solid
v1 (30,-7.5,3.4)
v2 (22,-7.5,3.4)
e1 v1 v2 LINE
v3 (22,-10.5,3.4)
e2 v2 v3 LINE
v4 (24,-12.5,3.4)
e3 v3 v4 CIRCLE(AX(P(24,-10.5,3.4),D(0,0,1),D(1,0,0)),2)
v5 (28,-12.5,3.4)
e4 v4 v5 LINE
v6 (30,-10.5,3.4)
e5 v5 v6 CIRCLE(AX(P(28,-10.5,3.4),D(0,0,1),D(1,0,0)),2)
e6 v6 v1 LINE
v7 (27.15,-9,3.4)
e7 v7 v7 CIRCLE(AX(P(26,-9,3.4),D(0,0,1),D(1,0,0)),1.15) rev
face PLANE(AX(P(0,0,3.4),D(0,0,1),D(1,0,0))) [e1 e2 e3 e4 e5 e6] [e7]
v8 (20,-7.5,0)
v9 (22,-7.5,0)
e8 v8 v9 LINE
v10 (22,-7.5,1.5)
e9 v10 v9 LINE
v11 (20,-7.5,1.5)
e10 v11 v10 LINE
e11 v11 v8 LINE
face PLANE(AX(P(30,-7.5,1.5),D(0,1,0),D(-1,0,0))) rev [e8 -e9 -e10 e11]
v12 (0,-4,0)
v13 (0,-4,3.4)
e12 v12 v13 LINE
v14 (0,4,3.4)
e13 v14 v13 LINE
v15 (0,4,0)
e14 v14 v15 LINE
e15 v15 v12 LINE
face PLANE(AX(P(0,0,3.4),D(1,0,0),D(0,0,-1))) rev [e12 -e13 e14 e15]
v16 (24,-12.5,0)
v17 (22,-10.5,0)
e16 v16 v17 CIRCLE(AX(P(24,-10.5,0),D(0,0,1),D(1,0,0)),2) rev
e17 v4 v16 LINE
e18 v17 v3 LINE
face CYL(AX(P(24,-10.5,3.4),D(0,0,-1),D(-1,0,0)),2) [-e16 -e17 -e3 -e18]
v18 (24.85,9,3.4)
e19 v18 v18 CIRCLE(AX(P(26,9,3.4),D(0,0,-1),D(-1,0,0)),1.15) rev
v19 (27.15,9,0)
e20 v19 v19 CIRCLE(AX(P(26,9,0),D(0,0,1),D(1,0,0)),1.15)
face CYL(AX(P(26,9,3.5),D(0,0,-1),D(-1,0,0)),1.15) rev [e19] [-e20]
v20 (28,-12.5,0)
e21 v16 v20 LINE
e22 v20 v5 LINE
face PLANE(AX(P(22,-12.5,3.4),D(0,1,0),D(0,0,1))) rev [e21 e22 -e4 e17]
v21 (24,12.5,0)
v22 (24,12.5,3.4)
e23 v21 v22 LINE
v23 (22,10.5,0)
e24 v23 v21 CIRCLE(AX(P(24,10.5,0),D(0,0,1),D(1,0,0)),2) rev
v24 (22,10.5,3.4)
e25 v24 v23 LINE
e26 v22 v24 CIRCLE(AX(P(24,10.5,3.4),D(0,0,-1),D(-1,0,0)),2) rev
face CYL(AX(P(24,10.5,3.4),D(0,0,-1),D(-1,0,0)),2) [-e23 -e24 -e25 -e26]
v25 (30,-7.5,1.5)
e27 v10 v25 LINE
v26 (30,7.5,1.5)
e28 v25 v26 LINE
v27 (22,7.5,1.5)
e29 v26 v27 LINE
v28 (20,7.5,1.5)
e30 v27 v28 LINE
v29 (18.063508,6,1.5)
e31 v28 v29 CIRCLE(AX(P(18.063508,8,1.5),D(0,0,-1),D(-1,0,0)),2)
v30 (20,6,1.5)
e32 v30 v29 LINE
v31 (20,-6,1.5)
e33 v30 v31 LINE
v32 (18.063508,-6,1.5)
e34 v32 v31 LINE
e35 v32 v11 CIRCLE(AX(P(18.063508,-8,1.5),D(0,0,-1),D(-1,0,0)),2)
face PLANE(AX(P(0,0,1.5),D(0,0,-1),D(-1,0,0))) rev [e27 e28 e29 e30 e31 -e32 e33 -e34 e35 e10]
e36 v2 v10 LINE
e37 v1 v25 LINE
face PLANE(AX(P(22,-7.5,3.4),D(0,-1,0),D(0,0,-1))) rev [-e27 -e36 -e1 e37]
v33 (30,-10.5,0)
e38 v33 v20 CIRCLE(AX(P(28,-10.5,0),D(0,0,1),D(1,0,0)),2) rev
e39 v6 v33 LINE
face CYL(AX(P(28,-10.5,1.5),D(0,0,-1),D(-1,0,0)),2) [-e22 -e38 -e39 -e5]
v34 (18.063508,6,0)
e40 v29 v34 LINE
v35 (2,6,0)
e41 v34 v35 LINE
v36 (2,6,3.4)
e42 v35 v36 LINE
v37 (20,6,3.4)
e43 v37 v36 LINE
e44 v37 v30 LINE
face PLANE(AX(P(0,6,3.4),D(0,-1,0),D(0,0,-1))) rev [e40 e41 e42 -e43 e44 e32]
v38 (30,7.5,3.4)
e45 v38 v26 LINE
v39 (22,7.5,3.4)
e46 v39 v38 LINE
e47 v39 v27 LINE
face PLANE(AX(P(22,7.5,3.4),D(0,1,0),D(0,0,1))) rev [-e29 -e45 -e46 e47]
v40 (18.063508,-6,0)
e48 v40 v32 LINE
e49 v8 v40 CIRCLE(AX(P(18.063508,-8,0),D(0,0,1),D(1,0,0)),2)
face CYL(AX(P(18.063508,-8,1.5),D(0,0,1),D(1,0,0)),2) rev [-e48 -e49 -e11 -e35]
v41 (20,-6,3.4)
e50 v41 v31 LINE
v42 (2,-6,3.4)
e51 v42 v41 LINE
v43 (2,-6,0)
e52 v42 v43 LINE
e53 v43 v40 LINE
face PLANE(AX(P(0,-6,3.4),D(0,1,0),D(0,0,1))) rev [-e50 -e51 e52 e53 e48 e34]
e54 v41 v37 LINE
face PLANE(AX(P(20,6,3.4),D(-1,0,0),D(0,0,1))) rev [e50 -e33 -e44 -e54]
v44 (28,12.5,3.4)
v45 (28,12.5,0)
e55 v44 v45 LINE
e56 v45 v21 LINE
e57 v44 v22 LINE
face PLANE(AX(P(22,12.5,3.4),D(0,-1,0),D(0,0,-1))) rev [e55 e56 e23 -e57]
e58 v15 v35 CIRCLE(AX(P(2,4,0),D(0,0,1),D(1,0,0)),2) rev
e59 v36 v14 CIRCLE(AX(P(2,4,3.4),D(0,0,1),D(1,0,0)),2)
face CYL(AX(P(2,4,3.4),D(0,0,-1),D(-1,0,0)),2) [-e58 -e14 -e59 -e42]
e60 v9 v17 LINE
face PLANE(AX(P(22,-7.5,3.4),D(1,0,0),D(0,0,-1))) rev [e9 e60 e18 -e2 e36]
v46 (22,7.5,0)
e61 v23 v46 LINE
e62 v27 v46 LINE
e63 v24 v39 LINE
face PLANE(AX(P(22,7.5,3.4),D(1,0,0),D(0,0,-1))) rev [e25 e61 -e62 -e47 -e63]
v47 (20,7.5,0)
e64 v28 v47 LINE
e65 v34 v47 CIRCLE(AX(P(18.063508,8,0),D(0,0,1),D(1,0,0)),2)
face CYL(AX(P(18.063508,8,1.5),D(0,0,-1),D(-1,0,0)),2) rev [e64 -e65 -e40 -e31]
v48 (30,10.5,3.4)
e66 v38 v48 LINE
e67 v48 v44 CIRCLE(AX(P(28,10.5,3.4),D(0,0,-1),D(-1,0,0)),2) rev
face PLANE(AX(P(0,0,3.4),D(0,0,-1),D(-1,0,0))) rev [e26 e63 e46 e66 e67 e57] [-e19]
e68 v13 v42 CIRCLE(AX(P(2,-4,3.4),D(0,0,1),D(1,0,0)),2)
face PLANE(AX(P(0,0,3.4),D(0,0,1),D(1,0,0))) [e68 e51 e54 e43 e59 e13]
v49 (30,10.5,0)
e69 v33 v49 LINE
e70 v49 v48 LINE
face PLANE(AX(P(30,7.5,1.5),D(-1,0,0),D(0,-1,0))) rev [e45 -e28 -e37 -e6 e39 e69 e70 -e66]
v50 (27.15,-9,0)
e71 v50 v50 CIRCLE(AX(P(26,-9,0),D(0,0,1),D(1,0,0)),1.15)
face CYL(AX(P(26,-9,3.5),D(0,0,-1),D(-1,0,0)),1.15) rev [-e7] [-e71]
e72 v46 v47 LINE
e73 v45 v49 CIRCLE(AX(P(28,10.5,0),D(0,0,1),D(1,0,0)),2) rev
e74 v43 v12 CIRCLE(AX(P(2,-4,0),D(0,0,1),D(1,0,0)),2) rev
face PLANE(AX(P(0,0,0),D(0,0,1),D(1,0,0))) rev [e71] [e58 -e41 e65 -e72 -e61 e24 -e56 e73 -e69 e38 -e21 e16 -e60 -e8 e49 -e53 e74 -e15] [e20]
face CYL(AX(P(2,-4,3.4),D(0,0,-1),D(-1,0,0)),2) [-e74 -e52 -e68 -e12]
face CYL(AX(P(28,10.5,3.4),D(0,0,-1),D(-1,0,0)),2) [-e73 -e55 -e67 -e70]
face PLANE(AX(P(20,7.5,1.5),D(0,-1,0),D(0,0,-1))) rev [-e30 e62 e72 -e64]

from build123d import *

# Parameters (mm, degrees)
DODANIE_WYCI_GNI_CIE1_DEPTH = 3.4
DODANIE_WYCI_GNI_CIE2_DEPTH = 1.5
ZAOKR_GLENIE1_R             = 2
SZKIC4_W                    = 8
SZKIC4_H                    = 5
DODANIE_WYCI_GNI_CIE3_DEPTH = 3.4
ZAOKR_GLENIE2_R             = 2
SZKIC6_R                    = 1.15
WYTNIJ_WYCI_GNI_CIE1_DEPTH  = 3.5


with BuildPart() as part:
    # Szkic1 → Dodanie-wyciągnięcie1 (new body)
    with BuildSketch(Plane.XY):
        Polygon((0, 0), (0, 6), (20, 6), (20, -6), (0, -6), align=None)
    extrude(amount=DODANIE_WYCI_GNI_CIE1_DEPTH)

    # Szkic3 → Dodanie-wyciągnięcie2 (add)
    with BuildSketch(Plane.XY):
        Polygon((20, 6), (20, 7.5), (30, 7.5), (30, -7.5), (20, -7.5), (20, -6), align=None)
    extrude(amount=DODANIE_WYCI_GNI_CIE2_DEPTH)

    # Zaokrąglenie1
    # the kernel refuses this fillet: 2 mm, written as the material it adds along each edge
    with BuildSketch(Plane(origin=(20, -6, 0), x_dir=(-1, 0, 0), z_dir=(0, 0, 1))) as zaokr_glenie1_piece_1:
        with BuildLine():
            CenterArc((1.936491673, 2), ZAOKR_GLENIE1_R, 194.477512186, 75.522487814)
            Line((0, 1.5), (0, 0))
            Line((0, 0), (1.936491673, 0))
        make_face()
    extrude(amount=1.5)
    with BuildSketch(Plane(origin=(20, 6, 0), x_dir=(-1, 0, 0), z_dir=(0, 0, 1))) as zaokr_glenie1_piece_2:
        with BuildLine():
            CenterArc((1.936491673, -2), ZAOKR_GLENIE1_R, 90, 75.522487814)
            Line((0, -1.5), (0, 0))
            Line((0, 0), (1.936491673, 0))
        make_face()
    extrude(amount=1.5)
    # the kernel refuses this fillet: 2 mm, written as the material it takes off along each edge
    with BuildSketch(Plane(origin=(0, -6, -5), x_dir=(0, 1, 0), z_dir=(0, 0, 1))) as zaokr_glenie1_2_piece_1:
        with BuildLine():
            CenterArc((ZAOKR_GLENIE1_R, -ZAOKR_GLENIE1_R), ZAOKR_GLENIE1_R, 90, 90)
            Line((0, -ZAOKR_GLENIE1_R), (0, 0))
            Line((0, 0), (ZAOKR_GLENIE1_R, 0))
        make_face()
    extrude(amount=13.4, mode=Mode.SUBTRACT)
    with BuildSketch(Plane(origin=(0, 6, -5), x_dir=(0, -1, 0), z_dir=(0, 0, 1))) as zaokr_glenie1_2_piece_2:
        with BuildLine():
            CenterArc((ZAOKR_GLENIE1_R, ZAOKR_GLENIE1_R), ZAOKR_GLENIE1_R, 180, 90)
            Line((0, ZAOKR_GLENIE1_R), (0, 0))
            Line((0, 0), (ZAOKR_GLENIE1_R, 0))
        make_face()
    extrude(amount=13.4, mode=Mode.SUBTRACT)

    # Szkic4 → Dodanie-wyciągnięcie3 (add)
    with BuildSketch(Plane.XY):
        with Locations((26, 10)):
            Rectangle(SZKIC4_W, SZKIC4_H)
        with Locations((26, -10)):
            Rectangle(SZKIC4_W, SZKIC4_H)
    extrude(amount=DODANIE_WYCI_GNI_CIE3_DEPTH)

    # Zaokrąglenie2
    zaokr_glenie2_edges = [part.edges().sort_by_distance(p)[0] for p in [
        (30, 12.5, 1.7),
        (22, 12.5, 1.7),
        (22, -12.5, 1.7),
        (30, -12.5, 1.7),
    ]]
    fillet(zaokr_glenie2_edges, radius=ZAOKR_GLENIE2_R)

    # Szkic6 → Wytnij-wyciągnięcie1 (cut)
    with BuildSketch(Plane.XY):
        with Locations(Location((26, 9, 0), (0, 0, 180))):
            Circle(SZKIC6_R)
        with Locations((26, -9)):
            Circle(SZKIC6_R)
    extrude(amount=WYTNIJ_WYCI_GNI_CIE1_DEPTH, mode=Mode.SUBTRACT)


solid = part.part
